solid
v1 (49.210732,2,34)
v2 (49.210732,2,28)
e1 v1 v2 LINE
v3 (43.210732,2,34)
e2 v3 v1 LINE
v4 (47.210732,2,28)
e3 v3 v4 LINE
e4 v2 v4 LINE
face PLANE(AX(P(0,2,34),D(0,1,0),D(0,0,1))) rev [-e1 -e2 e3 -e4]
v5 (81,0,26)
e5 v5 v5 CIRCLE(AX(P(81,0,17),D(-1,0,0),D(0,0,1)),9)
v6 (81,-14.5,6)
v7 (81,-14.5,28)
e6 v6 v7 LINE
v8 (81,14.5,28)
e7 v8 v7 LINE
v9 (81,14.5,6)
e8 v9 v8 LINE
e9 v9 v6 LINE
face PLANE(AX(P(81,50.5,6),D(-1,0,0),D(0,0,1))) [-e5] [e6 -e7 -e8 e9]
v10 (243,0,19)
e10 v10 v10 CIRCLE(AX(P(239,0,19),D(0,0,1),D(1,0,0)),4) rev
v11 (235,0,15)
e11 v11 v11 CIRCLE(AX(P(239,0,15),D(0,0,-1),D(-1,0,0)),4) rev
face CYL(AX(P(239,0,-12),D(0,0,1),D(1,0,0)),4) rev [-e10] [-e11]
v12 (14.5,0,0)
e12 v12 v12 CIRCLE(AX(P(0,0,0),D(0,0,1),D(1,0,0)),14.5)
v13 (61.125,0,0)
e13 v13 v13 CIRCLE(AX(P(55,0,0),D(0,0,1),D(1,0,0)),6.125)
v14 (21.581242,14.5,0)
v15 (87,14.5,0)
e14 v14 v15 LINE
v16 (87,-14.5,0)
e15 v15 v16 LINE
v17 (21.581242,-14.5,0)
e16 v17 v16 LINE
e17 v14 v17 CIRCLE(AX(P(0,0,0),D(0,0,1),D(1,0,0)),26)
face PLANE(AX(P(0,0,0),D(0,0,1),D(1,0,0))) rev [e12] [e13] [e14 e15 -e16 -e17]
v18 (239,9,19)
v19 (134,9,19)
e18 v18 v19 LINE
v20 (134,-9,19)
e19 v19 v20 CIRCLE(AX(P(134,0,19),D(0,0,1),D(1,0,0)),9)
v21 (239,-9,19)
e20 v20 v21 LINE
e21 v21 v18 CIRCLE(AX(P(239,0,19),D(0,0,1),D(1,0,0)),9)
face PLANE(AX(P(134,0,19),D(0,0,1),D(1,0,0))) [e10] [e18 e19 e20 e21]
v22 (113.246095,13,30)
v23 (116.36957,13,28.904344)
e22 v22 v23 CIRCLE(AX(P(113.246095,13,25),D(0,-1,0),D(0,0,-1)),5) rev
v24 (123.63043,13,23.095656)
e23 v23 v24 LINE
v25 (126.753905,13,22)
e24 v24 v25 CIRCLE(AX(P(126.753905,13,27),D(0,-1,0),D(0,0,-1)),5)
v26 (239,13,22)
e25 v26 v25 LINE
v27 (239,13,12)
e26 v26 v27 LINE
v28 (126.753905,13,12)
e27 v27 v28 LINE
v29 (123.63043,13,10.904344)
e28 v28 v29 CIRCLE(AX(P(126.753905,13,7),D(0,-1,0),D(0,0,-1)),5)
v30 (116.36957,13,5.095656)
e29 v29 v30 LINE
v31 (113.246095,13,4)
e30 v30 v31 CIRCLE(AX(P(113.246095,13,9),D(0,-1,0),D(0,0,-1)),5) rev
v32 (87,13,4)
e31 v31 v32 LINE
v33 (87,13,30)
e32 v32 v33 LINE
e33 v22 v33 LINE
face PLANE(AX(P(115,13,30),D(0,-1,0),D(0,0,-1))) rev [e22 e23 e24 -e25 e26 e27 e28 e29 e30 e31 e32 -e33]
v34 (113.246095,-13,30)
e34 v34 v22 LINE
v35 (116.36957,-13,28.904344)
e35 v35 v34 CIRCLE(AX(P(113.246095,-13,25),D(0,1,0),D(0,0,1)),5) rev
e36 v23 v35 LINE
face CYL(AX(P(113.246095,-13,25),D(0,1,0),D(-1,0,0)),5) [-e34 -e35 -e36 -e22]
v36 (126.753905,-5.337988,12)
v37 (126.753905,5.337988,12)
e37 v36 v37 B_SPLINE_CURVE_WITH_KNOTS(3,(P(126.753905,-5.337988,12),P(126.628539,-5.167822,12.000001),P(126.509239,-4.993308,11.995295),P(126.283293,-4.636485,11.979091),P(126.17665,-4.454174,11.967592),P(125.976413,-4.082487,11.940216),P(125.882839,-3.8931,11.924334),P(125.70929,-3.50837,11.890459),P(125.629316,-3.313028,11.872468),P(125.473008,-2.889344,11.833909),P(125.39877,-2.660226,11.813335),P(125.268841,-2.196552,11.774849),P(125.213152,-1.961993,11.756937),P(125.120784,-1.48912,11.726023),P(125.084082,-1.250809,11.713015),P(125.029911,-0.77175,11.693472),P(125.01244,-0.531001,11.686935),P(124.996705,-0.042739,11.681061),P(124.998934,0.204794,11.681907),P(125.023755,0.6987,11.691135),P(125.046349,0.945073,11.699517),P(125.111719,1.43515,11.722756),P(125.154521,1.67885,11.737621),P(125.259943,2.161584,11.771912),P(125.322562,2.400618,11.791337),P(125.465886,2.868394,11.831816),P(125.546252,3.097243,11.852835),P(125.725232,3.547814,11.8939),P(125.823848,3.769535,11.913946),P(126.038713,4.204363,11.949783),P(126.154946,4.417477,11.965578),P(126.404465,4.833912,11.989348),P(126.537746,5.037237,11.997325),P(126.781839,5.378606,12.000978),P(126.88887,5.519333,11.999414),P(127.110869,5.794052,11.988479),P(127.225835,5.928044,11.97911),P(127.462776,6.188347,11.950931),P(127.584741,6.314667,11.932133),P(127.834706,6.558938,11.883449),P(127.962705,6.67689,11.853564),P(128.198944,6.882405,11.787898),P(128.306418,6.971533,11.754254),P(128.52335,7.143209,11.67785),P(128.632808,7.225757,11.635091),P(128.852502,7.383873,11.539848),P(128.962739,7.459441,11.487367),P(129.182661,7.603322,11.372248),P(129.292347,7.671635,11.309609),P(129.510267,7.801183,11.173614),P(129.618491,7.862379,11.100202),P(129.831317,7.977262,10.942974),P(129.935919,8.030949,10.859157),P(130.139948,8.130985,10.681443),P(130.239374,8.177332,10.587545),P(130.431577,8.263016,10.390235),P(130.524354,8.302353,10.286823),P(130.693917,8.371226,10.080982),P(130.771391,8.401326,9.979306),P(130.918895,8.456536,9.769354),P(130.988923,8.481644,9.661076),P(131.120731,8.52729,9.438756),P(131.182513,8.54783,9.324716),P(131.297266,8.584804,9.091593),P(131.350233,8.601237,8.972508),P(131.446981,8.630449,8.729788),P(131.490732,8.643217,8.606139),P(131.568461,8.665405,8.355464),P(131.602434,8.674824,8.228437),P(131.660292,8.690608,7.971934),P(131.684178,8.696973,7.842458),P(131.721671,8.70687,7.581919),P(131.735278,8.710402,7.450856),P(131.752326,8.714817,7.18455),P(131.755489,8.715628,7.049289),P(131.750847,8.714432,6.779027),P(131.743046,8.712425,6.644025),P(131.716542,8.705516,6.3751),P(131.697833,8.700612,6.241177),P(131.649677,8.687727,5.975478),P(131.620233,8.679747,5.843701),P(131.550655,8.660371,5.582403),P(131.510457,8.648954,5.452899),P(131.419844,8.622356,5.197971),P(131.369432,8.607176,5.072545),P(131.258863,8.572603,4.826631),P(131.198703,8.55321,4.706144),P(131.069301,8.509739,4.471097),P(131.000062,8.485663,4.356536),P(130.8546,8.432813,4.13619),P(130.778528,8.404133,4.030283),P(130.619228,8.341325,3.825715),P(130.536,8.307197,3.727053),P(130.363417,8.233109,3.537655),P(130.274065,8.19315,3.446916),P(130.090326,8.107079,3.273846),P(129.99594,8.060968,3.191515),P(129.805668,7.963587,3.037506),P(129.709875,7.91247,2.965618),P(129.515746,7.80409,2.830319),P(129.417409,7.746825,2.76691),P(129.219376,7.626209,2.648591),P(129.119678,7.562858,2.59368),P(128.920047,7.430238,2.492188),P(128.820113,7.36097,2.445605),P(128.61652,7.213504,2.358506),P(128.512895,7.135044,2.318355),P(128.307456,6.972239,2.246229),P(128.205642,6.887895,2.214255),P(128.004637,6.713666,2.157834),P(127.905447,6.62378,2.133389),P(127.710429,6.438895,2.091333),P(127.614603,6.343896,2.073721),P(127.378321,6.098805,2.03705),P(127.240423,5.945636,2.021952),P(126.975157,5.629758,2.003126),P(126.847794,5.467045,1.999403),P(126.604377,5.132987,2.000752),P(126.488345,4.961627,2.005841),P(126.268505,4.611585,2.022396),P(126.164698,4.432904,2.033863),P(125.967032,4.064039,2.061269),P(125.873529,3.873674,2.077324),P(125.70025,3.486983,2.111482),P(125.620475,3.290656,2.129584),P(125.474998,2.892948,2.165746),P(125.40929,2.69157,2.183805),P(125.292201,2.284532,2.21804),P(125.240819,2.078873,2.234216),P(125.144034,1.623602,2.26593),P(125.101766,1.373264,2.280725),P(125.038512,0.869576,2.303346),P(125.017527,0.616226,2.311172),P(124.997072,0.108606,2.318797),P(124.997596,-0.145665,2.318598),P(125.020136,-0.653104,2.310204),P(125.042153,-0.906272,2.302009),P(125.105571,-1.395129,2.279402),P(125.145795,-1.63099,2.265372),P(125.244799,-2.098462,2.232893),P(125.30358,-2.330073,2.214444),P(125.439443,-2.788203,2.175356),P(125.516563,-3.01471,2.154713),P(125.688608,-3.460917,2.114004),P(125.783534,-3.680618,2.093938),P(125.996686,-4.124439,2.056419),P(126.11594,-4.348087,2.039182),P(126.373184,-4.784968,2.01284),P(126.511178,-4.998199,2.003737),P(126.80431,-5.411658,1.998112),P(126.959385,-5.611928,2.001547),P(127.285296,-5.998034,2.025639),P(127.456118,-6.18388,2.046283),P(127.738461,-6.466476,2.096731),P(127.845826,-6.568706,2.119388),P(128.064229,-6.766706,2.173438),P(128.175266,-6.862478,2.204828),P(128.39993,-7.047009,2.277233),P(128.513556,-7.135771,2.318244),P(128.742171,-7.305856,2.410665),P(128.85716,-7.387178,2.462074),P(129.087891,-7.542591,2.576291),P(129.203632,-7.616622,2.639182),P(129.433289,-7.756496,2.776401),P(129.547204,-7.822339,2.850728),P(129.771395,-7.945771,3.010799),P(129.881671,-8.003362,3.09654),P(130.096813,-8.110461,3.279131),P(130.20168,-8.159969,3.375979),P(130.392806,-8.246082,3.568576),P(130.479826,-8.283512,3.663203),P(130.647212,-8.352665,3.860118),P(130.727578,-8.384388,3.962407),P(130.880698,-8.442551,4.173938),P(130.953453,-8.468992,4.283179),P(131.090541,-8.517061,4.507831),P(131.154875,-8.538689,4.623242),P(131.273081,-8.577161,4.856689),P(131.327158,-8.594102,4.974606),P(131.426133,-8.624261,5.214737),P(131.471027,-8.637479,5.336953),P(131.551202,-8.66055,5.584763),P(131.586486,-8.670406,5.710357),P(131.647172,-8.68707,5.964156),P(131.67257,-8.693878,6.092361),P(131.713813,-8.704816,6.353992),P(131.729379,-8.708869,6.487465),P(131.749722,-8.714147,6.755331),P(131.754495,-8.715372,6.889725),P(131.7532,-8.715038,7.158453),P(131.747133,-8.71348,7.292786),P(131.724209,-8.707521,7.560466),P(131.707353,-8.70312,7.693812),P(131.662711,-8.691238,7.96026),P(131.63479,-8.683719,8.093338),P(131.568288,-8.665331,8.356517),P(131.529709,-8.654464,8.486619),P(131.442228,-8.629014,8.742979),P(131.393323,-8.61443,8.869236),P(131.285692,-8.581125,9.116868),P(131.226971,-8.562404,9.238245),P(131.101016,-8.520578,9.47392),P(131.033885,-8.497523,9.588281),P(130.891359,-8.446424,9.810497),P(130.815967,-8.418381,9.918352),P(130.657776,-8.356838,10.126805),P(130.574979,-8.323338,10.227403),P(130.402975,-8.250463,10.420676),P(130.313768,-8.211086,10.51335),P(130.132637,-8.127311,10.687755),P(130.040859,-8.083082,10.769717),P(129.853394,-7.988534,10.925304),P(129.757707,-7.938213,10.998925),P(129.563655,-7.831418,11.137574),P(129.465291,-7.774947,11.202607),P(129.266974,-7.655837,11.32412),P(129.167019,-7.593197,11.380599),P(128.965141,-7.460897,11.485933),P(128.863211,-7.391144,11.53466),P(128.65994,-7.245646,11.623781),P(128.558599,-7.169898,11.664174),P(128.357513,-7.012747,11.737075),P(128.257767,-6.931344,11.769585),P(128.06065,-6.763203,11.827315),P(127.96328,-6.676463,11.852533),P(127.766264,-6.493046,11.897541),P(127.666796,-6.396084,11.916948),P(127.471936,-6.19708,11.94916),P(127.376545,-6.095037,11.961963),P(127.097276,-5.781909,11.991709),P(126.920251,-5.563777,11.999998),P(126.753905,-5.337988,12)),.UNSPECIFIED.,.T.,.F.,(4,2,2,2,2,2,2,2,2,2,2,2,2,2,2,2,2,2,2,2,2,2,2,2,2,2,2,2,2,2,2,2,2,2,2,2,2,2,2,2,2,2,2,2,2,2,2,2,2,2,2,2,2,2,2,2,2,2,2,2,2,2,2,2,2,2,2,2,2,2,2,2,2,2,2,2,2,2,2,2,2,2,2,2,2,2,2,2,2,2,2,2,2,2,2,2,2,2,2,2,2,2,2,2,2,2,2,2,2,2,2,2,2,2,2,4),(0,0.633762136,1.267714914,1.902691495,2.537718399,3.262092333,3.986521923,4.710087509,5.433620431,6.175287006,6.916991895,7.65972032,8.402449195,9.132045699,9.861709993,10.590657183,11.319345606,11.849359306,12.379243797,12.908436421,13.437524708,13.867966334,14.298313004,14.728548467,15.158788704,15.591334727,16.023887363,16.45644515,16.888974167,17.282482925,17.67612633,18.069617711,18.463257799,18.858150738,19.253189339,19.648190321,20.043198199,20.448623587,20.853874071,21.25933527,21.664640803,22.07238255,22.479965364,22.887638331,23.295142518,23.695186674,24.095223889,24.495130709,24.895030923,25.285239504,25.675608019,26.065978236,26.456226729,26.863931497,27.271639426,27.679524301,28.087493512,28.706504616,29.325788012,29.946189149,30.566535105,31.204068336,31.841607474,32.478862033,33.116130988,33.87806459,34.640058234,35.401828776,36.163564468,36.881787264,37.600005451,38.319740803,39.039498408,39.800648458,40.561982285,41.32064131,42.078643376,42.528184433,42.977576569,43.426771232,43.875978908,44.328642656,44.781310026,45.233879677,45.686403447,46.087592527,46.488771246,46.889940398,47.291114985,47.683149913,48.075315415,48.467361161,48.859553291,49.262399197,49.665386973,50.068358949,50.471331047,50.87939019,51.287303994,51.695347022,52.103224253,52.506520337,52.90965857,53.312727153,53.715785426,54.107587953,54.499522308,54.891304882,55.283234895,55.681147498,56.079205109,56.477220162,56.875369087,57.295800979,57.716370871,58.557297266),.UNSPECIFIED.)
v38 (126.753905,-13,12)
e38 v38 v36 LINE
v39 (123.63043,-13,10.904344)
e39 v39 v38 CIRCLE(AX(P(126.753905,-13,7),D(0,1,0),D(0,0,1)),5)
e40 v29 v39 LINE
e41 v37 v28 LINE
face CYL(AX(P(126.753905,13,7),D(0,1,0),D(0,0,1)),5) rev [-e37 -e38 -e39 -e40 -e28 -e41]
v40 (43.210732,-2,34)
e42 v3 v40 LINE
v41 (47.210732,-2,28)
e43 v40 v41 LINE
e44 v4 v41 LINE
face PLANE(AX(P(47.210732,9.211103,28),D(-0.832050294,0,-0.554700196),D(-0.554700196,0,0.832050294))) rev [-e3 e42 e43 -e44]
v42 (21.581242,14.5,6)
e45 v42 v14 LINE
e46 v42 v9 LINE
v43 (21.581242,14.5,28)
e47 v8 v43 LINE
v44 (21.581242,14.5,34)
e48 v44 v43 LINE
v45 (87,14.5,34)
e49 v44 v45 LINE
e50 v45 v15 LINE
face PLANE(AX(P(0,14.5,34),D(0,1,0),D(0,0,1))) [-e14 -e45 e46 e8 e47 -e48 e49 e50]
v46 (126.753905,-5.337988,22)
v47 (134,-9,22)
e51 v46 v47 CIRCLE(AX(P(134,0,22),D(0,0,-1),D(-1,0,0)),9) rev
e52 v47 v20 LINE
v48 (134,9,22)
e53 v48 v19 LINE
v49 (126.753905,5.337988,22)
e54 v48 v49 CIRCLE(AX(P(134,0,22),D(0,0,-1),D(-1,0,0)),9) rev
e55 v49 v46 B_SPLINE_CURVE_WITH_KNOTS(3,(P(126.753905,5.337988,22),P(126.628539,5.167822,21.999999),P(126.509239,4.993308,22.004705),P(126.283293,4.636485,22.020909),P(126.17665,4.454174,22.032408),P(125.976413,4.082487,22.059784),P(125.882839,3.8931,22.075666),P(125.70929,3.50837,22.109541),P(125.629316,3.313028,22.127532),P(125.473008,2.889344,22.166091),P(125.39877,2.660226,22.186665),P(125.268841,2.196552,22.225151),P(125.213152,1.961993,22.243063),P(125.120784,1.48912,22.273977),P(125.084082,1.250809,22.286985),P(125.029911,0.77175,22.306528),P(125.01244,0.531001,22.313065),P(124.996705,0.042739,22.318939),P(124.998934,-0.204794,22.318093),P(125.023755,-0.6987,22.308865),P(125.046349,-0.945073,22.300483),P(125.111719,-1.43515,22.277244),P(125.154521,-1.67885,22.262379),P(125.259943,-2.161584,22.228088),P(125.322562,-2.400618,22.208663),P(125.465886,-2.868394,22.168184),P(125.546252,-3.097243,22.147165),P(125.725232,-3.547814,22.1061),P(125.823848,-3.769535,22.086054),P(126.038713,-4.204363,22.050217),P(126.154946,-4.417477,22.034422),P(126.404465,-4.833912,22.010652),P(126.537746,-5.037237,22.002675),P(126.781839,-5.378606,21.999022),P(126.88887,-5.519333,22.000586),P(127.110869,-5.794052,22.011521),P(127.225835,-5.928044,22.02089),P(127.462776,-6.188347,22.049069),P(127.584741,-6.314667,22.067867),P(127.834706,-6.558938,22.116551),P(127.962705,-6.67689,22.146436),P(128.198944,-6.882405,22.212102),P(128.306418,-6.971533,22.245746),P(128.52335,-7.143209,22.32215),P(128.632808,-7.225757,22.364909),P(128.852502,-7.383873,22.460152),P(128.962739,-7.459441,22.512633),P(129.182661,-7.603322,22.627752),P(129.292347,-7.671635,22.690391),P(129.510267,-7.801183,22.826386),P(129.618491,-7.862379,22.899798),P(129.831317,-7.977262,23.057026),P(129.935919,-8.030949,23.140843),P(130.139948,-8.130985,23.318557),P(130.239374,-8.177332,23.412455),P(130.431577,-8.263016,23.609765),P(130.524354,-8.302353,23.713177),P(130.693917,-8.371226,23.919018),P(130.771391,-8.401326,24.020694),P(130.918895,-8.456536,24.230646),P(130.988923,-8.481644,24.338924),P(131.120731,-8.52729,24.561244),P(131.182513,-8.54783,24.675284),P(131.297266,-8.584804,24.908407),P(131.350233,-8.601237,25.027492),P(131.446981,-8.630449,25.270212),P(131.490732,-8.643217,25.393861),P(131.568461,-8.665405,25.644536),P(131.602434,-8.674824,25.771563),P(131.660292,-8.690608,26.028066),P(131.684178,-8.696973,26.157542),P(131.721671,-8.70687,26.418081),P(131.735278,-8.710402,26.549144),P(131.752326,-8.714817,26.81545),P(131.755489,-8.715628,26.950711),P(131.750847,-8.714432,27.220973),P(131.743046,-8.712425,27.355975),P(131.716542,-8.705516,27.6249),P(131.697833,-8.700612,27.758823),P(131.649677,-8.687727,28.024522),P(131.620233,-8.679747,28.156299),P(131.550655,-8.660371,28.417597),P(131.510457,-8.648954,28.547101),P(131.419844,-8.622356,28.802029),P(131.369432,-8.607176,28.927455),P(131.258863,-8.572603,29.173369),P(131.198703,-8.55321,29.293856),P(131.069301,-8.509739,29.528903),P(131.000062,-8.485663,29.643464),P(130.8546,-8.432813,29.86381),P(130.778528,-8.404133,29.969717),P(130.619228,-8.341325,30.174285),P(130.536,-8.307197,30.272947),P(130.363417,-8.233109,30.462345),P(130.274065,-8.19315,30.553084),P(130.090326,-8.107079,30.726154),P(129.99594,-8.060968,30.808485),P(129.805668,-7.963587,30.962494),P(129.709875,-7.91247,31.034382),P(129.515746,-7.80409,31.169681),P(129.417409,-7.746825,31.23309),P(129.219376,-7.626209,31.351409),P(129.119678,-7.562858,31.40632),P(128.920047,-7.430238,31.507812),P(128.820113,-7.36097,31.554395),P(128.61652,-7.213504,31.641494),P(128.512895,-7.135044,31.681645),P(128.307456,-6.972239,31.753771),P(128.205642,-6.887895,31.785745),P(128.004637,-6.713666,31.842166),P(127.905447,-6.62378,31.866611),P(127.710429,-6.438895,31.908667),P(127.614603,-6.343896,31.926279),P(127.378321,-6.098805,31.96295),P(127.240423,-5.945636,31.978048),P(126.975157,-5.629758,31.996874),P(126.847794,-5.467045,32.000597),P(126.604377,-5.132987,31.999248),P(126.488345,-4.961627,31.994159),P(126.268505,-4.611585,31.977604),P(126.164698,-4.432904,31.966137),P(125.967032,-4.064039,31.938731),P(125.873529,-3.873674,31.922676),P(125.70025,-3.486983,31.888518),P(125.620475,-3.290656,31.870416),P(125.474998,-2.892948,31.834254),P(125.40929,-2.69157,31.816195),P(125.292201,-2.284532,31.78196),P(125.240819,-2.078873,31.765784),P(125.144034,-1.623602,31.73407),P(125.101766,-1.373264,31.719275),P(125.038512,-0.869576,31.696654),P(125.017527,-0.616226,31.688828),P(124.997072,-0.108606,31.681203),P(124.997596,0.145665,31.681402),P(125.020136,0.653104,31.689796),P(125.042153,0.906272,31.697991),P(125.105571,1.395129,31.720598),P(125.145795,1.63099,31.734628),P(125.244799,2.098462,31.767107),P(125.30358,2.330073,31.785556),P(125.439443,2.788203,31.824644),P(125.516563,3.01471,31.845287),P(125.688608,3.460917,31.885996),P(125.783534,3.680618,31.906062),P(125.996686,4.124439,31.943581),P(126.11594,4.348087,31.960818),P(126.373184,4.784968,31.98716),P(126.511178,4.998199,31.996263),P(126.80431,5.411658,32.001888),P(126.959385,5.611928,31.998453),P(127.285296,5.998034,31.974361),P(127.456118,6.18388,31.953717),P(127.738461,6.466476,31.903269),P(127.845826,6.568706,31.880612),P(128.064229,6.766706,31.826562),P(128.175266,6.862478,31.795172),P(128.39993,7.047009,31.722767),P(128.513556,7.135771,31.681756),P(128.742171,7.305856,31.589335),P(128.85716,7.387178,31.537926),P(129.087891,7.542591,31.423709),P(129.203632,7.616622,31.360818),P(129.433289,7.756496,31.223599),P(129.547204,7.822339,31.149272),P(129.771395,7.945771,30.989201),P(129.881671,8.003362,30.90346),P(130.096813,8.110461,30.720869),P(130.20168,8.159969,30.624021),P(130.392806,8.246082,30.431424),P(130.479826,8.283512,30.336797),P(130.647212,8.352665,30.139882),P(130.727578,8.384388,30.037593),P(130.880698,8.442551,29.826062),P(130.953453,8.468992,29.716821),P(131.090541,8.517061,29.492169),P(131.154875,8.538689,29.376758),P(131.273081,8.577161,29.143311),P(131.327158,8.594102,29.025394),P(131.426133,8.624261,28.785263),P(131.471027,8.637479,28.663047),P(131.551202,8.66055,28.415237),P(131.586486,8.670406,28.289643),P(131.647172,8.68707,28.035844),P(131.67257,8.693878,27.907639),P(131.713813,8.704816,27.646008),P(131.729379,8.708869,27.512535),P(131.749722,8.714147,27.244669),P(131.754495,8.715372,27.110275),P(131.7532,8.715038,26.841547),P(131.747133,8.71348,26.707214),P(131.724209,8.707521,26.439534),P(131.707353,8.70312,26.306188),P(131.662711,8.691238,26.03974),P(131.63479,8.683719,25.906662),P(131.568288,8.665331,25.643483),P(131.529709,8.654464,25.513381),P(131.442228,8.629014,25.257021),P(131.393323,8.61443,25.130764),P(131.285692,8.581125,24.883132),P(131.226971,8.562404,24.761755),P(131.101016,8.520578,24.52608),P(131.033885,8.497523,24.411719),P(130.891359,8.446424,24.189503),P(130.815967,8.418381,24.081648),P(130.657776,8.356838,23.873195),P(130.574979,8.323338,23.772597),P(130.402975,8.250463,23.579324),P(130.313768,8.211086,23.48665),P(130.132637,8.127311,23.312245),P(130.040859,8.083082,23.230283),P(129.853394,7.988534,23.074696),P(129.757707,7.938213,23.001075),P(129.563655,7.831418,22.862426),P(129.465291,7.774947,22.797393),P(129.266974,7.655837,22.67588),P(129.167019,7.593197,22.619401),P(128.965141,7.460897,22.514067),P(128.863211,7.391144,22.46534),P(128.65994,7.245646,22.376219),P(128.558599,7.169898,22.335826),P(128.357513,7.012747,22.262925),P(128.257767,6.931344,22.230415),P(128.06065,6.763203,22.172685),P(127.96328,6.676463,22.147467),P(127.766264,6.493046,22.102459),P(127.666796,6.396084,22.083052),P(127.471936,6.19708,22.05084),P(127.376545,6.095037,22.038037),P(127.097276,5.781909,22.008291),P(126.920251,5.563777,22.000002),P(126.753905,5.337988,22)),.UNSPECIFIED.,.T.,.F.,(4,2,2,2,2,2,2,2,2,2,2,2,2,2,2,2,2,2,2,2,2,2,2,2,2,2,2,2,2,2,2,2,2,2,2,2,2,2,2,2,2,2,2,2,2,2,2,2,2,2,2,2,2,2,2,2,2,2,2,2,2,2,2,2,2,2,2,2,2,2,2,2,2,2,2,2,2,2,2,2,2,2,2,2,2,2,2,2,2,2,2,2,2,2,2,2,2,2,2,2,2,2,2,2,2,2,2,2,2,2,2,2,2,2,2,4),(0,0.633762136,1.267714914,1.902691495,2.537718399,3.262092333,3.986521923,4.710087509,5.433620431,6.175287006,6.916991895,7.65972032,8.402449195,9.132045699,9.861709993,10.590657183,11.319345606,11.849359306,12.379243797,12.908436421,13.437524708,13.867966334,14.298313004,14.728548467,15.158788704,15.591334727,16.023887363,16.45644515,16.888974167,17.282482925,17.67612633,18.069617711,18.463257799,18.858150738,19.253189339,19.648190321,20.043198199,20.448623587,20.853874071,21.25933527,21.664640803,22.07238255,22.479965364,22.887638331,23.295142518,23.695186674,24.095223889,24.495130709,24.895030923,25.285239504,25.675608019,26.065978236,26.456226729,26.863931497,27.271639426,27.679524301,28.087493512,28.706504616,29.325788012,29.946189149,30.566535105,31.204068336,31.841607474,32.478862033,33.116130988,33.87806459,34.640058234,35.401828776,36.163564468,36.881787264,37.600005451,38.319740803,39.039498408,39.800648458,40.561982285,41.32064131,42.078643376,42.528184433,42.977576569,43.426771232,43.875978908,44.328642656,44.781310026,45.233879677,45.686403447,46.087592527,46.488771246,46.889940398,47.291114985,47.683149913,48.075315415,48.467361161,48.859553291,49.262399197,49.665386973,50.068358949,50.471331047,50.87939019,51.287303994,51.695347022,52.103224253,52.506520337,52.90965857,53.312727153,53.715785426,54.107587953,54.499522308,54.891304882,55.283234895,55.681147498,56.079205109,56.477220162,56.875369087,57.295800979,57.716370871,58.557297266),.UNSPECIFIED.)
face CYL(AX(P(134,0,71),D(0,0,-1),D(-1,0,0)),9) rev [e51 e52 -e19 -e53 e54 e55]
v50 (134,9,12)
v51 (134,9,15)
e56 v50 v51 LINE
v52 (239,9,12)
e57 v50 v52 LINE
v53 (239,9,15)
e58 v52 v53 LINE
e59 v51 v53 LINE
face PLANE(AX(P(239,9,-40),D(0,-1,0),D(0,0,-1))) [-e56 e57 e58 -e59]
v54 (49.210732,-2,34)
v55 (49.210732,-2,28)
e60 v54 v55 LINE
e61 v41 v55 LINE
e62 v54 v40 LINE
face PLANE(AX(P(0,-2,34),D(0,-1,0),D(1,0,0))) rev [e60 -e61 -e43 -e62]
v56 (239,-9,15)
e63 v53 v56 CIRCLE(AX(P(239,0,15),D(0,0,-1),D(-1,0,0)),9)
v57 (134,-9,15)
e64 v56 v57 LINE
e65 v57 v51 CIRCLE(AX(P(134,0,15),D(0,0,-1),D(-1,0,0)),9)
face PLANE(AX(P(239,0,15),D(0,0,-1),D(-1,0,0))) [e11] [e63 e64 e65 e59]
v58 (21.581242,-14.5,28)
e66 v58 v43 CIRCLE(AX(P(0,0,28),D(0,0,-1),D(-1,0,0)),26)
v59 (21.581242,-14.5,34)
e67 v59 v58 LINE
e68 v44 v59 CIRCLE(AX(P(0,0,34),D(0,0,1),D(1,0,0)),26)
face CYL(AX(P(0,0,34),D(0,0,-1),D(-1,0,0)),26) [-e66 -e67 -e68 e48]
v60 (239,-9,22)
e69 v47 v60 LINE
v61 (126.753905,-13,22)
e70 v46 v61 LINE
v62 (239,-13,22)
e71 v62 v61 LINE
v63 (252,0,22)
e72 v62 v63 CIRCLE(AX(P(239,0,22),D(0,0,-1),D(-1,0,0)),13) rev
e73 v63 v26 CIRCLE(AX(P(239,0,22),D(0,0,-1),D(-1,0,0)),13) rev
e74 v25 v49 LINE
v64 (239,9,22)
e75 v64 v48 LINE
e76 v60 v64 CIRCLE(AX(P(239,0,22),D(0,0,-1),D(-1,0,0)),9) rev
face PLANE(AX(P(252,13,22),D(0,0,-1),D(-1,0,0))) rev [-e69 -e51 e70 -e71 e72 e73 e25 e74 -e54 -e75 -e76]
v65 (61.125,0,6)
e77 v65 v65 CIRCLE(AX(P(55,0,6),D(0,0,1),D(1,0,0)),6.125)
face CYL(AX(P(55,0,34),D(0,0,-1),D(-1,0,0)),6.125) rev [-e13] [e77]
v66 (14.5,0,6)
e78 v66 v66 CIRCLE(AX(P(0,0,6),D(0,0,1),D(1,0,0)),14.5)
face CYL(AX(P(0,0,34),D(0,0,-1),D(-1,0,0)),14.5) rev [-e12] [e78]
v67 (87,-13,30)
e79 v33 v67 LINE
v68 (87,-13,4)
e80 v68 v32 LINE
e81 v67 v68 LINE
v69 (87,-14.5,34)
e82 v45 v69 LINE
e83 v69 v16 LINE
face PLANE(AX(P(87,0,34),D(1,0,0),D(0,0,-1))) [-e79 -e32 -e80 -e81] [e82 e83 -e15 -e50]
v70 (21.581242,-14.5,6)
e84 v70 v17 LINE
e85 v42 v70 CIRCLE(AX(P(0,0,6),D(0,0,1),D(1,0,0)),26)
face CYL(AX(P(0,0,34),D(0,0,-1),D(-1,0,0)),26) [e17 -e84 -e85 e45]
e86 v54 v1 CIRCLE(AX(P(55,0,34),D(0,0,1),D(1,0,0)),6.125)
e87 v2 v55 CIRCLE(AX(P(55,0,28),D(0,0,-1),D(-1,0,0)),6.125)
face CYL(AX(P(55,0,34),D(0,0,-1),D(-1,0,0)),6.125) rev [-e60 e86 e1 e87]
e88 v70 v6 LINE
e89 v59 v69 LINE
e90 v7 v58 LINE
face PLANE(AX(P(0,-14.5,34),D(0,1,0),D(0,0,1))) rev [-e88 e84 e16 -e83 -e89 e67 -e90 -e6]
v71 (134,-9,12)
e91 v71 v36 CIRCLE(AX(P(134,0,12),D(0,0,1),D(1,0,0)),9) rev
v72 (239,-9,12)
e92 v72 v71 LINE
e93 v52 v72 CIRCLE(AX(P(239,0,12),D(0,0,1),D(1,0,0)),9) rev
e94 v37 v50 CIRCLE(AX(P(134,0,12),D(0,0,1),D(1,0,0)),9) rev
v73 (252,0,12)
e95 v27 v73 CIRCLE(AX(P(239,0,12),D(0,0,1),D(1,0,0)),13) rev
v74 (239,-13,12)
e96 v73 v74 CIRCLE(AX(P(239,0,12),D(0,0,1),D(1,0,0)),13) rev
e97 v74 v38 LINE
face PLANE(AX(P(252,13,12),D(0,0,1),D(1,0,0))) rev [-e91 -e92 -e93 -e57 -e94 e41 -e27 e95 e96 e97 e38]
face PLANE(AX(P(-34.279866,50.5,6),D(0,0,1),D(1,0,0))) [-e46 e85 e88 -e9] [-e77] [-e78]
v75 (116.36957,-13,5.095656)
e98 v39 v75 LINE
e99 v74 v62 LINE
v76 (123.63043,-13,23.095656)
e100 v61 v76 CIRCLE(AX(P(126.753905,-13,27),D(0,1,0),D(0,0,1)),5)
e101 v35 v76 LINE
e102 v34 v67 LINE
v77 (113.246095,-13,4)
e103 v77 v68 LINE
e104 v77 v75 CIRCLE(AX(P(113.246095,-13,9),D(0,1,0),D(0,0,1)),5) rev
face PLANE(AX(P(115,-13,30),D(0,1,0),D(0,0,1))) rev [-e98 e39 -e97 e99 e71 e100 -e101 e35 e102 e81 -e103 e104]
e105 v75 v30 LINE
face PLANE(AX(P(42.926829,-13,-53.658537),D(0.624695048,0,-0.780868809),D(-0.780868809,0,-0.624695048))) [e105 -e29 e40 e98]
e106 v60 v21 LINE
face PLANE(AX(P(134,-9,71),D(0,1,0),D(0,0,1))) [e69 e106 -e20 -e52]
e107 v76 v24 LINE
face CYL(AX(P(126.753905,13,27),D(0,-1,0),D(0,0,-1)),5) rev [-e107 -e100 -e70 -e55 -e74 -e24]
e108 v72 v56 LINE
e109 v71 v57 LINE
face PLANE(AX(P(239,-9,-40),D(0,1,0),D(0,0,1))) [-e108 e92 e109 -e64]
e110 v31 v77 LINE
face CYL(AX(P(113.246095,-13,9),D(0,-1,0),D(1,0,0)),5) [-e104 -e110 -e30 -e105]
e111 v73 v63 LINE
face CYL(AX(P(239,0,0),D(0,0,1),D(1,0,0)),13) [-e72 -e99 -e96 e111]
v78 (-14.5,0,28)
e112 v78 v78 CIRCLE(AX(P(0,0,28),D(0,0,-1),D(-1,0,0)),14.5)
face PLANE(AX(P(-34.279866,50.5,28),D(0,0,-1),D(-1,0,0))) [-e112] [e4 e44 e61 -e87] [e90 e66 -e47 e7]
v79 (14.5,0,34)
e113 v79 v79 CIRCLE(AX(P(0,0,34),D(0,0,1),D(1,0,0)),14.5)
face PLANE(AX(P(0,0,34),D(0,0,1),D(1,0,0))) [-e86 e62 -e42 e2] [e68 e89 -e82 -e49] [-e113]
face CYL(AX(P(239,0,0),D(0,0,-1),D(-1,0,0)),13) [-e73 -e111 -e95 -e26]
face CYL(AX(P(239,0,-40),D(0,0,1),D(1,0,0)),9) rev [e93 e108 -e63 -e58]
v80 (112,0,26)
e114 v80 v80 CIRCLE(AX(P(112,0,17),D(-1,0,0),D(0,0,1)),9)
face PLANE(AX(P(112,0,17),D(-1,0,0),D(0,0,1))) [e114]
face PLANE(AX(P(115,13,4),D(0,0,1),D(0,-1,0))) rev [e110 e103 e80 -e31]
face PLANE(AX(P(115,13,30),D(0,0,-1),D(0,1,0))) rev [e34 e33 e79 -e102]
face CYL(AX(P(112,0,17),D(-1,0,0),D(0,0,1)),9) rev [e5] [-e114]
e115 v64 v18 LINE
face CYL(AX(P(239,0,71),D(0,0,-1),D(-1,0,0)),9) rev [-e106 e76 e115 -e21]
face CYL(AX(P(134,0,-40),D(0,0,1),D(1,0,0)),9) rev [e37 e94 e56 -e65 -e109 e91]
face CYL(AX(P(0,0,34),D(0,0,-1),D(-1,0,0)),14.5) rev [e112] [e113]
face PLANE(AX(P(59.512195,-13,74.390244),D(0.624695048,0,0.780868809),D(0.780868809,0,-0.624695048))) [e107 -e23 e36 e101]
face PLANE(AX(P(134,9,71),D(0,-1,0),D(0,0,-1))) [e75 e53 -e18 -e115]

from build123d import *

# Parameters (mm, degrees)
ESBO_O1_R                  = 14.5
RESSALTO_EXTRUS_O1_DEPTH   = 34
CORTE_EXTRUS_O1_DEPTH      = 36
CORTE_EXTRUS_O1_DEPTH_BACK = 56
ESBO_O2_W                  = 115.279866195
ESBO_O2_H                  = 22
RESSALTO_EXTRUS_O2_DEPTH   = 4
RESSALTO_EXTRUS_O3_START   = -6
RESSALTO_EXTRUS_O3_DEPTH   = 6
ESBO_O5_W                  = 26
ESBO_O5_H                  = 26
RESSALTO_EXTRUS_O4_DEPTH   = 28
ESBO_O6_R                  = 9
CORTE_EXTRUS_O2_DEPTH      = 31
ESBO_O7_W                  = 10
ESBO_O7_H                  = 26
RESSALTO_EXTRUS_O5_DEPTH   = 10
RESSALTO_EXTRUS_O7_START   = -26
RESSALTO_EXTRUS_O7_DEPTH   = 26
FILETE1_R                  = 5
ESBO_O9_W                  = 10
ESBO_O9_H                  = 26
RESSALTO_EXTRUS_O8_DEPTH   = 127
FILETE2_R                  = 13
FILETE3_R                  = 5
CORTE_EXTRUS_O3_DEPTH      = 49
CORTE_EXTRUS_O3_DEPTH_BACK = 3
CORTE_EXTRUS_O4_DEPTH      = 52
CORTE_EXTRUS_O4_DEPTH_BACK = 3
CORTE_EXTRUS_O5_DEPTH      = 27
CORTE_EXTRUS_O5_DEPTH_BACK = 22
ESBO_O12_R                 = 4


with BuildPart() as part:
    # Esboço1 → Ressalto-extrusão1 (new body)
    with BuildSketch(Plane.XY):
        with BuildLine():
            Line((21.581241855, 14.5), (87, 14.5))
            Line((87, 14.5), (87, -14.5))
            Line((87, -14.5), (21.581241855, -14.5))
            ThreePointArc((21.581241855, -14.5), (-26, 0), (21.581241855, 14.5))
        make_face()
        Circle(ESBO_O1_R, mode=Mode.SUBTRACT)
        with BuildLine():
            ThreePointArc((49.210731912, -2), (61.125, 0), (49.210731912, 2))
            Line((49.210731912, 2), (43.210731912, 2))
            Line((43.210731912, 2), (43.210731912, -2))
            Line((43.210731912, -2), (49.210731912, -2))
        make_face(mode=Mode.SUBTRACT)
    extrude(amount=RESSALTO_EXTRUS_O1_DEPTH)

    # Esboço2 → Corte-extrusão1 (cut, two sides: drawn at the far end of the back side and taken through both)
    with BuildSketch(Plane(origin=(0, 14.5, 0), x_dir=(1, 0, 0), z_dir=(0, 1, 0)).offset(-CORTE_EXTRUS_O1_DEPTH_BACK)):
        with Locations((23.360066902, -17)):
            Rectangle(ESBO_O2_W, ESBO_O2_H)
    extrude(amount=CORTE_EXTRUS_O1_DEPTH + CORTE_EXTRUS_O1_DEPTH_BACK, mode=Mode.SUBTRACT)

    # Esboço3 → Ressalto-extrusão2 (add)
    with BuildSketch(Plane(origin=(0, -2, 0), x_dir=(1, 0, 0), z_dir=(0, 1, 0))):
        Polygon((43.210731912, -28), (47.210731912, -28), (43.210731912, -34), align=None)
    extrude(amount=RESSALTO_EXTRUS_O2_DEPTH)

    # Esboço4 → Ressalto-extrusão3 (add)
    with BuildSketch(Plane.XY.offset(6).offset(RESSALTO_EXTRUS_O3_START)):
        with BuildLine():
            ThreePointArc((49.210731912, 2), (48.875, 0), (49.210731912, -2))
            Line((49.210731912, -2), (43.210731912, -2))
            Line((43.210731912, -2), (43.210731912, 2))
            Line((43.210731912, 2), (49.210731912, 2))
        make_face()
    extrude(amount=RESSALTO_EXTRUS_O3_DEPTH)

    # Esboço5 → Ressalto-extrusão4 (add)
    with BuildSketch(Plane(origin=(87, 0, 0), x_dir=(0, 0, -1), z_dir=(1, 0, 0))):
        with Locations((-17, 0)):
            Rectangle(ESBO_O5_W, ESBO_O5_H)
    extrude(amount=RESSALTO_EXTRUS_O4_DEPTH)

    # Esboço6 → Corte-extrusão2 (cut)
    with BuildSketch(Plane.ZY.offset(-81)):
        with Locations((17, 0)):
            Circle(ESBO_O6_R)
    extrude(amount=-CORTE_EXTRUS_O2_DEPTH, mode=Mode.SUBTRACT)

    # Esboço7 → Ressalto-extrusão5 (add)
    with BuildSketch(Plane(origin=(115, 0, 0), x_dir=(0, 0, -1), z_dir=(1, 0, 0))):
        with Locations((-17, 0)):
            Rectangle(ESBO_O7_W, ESBO_O7_H)
    extrude(amount=RESSALTO_EXTRUS_O5_DEPTH)

    # Esboço8 → Ressalto-extrusão7 (add)
    with BuildSketch(Plane(origin=(0, 13, 0), x_dir=(1, 0, 0), z_dir=(0, 1, 0)).offset(RESSALTO_EXTRUS_O7_START)):
        Polygon((125, -12), (115, -4), (115, -12), align=None)
        Polygon((125, -22), (115, -22), (115, -30), align=None)
    extrude(amount=RESSALTO_EXTRUS_O7_DEPTH)

    # Filete1
    filete1_edges = [part.edges().sort_by_distance(p)[0] for p in [
        (115, 0, 30),
        (115, 0, 4),
    ]]
    fillet(filete1_edges, radius=FILETE1_R)

    # Esboço9 → Ressalto-extrusão8 (add)
    with BuildSketch(Plane(origin=(125, 0, 0), x_dir=(0, 0, -1), z_dir=(1, 0, 0))):
        with Locations((-17, 0)):
            Rectangle(ESBO_O9_W, ESBO_O9_H)
    extrude(amount=RESSALTO_EXTRUS_O8_DEPTH)

    # Filete2
    filete2_edges = [part.edges().sort_by_distance(p)[0] for p in [
        (252, -13, 17),
        (252, 13, 17),
    ]]
    fillet(filete2_edges, radius=FILETE2_R - 0.0001)  # a hair under: the kernel refuses the full size

    # Filete3
    filete3_edges = [part.edges().sort_by_distance(p)[0] for p in [
        (125, 0, 22),
        (125, 0, 12),
    ]]
    fillet(filete3_edges, radius=FILETE3_R)

    # Esboço10 → Corte-extrusão3 (cut, two sides: drawn at the far end of the back side and taken through both)
    with BuildSketch(Plane.XY.offset(22).offset(-CORTE_EXTRUS_O3_DEPTH_BACK)):
        with BuildLine():
            Line((134, 9), (239, 9))
            ThreePointArc((239, 9), (248, 0), (239, -9))
            Line((239, -9), (134, -9))
            ThreePointArc((134, -9), (125, 0), (134, 9))
        make_face()
    extrude(amount=CORTE_EXTRUS_O3_DEPTH + CORTE_EXTRUS_O3_DEPTH_BACK, mode=Mode.SUBTRACT)

    # Esboço11 → Corte-extrusão4 (cut, two sides: drawn at the far end of the back side and taken through both)
    with BuildSketch(Plane(origin=(0, 0, 12), x_dir=(-1, 0, 0), z_dir=(0, 0, -1)).offset(-CORTE_EXTRUS_O4_DEPTH_BACK)):
        with BuildLine():
            Line((-239, 9), (-134, 9))
            ThreePointArc((-134, 9), (-125, 0), (-134, -9))
            Line((-134, -9), (-239, -9))
            ThreePointArc((-239, -9), (-248, 0), (-239, 9))
        make_face()
    extrude(amount=CORTE_EXTRUS_O4_DEPTH + CORTE_EXTRUS_O4_DEPTH_BACK, mode=Mode.SUBTRACT)

    # Esboço12 → Corte-extrusão5 (cut, two sides: drawn at the far end of the back side and taken through both)
    with BuildSketch(Plane(origin=(0, 0, 15), x_dir=(-1, 0, 0), z_dir=(0, 0, -1)).offset(-CORTE_EXTRUS_O5_DEPTH_BACK)):
        with Locations(Location((-239, 0, 0), (0, 0, 180))):
            Circle(ESBO_O12_R)
    extrude(amount=CORTE_EXTRUS_O5_DEPTH + CORTE_EXTRUS_O5_DEPTH_BACK, mode=Mode.SUBTRACT)


solid = part.part
